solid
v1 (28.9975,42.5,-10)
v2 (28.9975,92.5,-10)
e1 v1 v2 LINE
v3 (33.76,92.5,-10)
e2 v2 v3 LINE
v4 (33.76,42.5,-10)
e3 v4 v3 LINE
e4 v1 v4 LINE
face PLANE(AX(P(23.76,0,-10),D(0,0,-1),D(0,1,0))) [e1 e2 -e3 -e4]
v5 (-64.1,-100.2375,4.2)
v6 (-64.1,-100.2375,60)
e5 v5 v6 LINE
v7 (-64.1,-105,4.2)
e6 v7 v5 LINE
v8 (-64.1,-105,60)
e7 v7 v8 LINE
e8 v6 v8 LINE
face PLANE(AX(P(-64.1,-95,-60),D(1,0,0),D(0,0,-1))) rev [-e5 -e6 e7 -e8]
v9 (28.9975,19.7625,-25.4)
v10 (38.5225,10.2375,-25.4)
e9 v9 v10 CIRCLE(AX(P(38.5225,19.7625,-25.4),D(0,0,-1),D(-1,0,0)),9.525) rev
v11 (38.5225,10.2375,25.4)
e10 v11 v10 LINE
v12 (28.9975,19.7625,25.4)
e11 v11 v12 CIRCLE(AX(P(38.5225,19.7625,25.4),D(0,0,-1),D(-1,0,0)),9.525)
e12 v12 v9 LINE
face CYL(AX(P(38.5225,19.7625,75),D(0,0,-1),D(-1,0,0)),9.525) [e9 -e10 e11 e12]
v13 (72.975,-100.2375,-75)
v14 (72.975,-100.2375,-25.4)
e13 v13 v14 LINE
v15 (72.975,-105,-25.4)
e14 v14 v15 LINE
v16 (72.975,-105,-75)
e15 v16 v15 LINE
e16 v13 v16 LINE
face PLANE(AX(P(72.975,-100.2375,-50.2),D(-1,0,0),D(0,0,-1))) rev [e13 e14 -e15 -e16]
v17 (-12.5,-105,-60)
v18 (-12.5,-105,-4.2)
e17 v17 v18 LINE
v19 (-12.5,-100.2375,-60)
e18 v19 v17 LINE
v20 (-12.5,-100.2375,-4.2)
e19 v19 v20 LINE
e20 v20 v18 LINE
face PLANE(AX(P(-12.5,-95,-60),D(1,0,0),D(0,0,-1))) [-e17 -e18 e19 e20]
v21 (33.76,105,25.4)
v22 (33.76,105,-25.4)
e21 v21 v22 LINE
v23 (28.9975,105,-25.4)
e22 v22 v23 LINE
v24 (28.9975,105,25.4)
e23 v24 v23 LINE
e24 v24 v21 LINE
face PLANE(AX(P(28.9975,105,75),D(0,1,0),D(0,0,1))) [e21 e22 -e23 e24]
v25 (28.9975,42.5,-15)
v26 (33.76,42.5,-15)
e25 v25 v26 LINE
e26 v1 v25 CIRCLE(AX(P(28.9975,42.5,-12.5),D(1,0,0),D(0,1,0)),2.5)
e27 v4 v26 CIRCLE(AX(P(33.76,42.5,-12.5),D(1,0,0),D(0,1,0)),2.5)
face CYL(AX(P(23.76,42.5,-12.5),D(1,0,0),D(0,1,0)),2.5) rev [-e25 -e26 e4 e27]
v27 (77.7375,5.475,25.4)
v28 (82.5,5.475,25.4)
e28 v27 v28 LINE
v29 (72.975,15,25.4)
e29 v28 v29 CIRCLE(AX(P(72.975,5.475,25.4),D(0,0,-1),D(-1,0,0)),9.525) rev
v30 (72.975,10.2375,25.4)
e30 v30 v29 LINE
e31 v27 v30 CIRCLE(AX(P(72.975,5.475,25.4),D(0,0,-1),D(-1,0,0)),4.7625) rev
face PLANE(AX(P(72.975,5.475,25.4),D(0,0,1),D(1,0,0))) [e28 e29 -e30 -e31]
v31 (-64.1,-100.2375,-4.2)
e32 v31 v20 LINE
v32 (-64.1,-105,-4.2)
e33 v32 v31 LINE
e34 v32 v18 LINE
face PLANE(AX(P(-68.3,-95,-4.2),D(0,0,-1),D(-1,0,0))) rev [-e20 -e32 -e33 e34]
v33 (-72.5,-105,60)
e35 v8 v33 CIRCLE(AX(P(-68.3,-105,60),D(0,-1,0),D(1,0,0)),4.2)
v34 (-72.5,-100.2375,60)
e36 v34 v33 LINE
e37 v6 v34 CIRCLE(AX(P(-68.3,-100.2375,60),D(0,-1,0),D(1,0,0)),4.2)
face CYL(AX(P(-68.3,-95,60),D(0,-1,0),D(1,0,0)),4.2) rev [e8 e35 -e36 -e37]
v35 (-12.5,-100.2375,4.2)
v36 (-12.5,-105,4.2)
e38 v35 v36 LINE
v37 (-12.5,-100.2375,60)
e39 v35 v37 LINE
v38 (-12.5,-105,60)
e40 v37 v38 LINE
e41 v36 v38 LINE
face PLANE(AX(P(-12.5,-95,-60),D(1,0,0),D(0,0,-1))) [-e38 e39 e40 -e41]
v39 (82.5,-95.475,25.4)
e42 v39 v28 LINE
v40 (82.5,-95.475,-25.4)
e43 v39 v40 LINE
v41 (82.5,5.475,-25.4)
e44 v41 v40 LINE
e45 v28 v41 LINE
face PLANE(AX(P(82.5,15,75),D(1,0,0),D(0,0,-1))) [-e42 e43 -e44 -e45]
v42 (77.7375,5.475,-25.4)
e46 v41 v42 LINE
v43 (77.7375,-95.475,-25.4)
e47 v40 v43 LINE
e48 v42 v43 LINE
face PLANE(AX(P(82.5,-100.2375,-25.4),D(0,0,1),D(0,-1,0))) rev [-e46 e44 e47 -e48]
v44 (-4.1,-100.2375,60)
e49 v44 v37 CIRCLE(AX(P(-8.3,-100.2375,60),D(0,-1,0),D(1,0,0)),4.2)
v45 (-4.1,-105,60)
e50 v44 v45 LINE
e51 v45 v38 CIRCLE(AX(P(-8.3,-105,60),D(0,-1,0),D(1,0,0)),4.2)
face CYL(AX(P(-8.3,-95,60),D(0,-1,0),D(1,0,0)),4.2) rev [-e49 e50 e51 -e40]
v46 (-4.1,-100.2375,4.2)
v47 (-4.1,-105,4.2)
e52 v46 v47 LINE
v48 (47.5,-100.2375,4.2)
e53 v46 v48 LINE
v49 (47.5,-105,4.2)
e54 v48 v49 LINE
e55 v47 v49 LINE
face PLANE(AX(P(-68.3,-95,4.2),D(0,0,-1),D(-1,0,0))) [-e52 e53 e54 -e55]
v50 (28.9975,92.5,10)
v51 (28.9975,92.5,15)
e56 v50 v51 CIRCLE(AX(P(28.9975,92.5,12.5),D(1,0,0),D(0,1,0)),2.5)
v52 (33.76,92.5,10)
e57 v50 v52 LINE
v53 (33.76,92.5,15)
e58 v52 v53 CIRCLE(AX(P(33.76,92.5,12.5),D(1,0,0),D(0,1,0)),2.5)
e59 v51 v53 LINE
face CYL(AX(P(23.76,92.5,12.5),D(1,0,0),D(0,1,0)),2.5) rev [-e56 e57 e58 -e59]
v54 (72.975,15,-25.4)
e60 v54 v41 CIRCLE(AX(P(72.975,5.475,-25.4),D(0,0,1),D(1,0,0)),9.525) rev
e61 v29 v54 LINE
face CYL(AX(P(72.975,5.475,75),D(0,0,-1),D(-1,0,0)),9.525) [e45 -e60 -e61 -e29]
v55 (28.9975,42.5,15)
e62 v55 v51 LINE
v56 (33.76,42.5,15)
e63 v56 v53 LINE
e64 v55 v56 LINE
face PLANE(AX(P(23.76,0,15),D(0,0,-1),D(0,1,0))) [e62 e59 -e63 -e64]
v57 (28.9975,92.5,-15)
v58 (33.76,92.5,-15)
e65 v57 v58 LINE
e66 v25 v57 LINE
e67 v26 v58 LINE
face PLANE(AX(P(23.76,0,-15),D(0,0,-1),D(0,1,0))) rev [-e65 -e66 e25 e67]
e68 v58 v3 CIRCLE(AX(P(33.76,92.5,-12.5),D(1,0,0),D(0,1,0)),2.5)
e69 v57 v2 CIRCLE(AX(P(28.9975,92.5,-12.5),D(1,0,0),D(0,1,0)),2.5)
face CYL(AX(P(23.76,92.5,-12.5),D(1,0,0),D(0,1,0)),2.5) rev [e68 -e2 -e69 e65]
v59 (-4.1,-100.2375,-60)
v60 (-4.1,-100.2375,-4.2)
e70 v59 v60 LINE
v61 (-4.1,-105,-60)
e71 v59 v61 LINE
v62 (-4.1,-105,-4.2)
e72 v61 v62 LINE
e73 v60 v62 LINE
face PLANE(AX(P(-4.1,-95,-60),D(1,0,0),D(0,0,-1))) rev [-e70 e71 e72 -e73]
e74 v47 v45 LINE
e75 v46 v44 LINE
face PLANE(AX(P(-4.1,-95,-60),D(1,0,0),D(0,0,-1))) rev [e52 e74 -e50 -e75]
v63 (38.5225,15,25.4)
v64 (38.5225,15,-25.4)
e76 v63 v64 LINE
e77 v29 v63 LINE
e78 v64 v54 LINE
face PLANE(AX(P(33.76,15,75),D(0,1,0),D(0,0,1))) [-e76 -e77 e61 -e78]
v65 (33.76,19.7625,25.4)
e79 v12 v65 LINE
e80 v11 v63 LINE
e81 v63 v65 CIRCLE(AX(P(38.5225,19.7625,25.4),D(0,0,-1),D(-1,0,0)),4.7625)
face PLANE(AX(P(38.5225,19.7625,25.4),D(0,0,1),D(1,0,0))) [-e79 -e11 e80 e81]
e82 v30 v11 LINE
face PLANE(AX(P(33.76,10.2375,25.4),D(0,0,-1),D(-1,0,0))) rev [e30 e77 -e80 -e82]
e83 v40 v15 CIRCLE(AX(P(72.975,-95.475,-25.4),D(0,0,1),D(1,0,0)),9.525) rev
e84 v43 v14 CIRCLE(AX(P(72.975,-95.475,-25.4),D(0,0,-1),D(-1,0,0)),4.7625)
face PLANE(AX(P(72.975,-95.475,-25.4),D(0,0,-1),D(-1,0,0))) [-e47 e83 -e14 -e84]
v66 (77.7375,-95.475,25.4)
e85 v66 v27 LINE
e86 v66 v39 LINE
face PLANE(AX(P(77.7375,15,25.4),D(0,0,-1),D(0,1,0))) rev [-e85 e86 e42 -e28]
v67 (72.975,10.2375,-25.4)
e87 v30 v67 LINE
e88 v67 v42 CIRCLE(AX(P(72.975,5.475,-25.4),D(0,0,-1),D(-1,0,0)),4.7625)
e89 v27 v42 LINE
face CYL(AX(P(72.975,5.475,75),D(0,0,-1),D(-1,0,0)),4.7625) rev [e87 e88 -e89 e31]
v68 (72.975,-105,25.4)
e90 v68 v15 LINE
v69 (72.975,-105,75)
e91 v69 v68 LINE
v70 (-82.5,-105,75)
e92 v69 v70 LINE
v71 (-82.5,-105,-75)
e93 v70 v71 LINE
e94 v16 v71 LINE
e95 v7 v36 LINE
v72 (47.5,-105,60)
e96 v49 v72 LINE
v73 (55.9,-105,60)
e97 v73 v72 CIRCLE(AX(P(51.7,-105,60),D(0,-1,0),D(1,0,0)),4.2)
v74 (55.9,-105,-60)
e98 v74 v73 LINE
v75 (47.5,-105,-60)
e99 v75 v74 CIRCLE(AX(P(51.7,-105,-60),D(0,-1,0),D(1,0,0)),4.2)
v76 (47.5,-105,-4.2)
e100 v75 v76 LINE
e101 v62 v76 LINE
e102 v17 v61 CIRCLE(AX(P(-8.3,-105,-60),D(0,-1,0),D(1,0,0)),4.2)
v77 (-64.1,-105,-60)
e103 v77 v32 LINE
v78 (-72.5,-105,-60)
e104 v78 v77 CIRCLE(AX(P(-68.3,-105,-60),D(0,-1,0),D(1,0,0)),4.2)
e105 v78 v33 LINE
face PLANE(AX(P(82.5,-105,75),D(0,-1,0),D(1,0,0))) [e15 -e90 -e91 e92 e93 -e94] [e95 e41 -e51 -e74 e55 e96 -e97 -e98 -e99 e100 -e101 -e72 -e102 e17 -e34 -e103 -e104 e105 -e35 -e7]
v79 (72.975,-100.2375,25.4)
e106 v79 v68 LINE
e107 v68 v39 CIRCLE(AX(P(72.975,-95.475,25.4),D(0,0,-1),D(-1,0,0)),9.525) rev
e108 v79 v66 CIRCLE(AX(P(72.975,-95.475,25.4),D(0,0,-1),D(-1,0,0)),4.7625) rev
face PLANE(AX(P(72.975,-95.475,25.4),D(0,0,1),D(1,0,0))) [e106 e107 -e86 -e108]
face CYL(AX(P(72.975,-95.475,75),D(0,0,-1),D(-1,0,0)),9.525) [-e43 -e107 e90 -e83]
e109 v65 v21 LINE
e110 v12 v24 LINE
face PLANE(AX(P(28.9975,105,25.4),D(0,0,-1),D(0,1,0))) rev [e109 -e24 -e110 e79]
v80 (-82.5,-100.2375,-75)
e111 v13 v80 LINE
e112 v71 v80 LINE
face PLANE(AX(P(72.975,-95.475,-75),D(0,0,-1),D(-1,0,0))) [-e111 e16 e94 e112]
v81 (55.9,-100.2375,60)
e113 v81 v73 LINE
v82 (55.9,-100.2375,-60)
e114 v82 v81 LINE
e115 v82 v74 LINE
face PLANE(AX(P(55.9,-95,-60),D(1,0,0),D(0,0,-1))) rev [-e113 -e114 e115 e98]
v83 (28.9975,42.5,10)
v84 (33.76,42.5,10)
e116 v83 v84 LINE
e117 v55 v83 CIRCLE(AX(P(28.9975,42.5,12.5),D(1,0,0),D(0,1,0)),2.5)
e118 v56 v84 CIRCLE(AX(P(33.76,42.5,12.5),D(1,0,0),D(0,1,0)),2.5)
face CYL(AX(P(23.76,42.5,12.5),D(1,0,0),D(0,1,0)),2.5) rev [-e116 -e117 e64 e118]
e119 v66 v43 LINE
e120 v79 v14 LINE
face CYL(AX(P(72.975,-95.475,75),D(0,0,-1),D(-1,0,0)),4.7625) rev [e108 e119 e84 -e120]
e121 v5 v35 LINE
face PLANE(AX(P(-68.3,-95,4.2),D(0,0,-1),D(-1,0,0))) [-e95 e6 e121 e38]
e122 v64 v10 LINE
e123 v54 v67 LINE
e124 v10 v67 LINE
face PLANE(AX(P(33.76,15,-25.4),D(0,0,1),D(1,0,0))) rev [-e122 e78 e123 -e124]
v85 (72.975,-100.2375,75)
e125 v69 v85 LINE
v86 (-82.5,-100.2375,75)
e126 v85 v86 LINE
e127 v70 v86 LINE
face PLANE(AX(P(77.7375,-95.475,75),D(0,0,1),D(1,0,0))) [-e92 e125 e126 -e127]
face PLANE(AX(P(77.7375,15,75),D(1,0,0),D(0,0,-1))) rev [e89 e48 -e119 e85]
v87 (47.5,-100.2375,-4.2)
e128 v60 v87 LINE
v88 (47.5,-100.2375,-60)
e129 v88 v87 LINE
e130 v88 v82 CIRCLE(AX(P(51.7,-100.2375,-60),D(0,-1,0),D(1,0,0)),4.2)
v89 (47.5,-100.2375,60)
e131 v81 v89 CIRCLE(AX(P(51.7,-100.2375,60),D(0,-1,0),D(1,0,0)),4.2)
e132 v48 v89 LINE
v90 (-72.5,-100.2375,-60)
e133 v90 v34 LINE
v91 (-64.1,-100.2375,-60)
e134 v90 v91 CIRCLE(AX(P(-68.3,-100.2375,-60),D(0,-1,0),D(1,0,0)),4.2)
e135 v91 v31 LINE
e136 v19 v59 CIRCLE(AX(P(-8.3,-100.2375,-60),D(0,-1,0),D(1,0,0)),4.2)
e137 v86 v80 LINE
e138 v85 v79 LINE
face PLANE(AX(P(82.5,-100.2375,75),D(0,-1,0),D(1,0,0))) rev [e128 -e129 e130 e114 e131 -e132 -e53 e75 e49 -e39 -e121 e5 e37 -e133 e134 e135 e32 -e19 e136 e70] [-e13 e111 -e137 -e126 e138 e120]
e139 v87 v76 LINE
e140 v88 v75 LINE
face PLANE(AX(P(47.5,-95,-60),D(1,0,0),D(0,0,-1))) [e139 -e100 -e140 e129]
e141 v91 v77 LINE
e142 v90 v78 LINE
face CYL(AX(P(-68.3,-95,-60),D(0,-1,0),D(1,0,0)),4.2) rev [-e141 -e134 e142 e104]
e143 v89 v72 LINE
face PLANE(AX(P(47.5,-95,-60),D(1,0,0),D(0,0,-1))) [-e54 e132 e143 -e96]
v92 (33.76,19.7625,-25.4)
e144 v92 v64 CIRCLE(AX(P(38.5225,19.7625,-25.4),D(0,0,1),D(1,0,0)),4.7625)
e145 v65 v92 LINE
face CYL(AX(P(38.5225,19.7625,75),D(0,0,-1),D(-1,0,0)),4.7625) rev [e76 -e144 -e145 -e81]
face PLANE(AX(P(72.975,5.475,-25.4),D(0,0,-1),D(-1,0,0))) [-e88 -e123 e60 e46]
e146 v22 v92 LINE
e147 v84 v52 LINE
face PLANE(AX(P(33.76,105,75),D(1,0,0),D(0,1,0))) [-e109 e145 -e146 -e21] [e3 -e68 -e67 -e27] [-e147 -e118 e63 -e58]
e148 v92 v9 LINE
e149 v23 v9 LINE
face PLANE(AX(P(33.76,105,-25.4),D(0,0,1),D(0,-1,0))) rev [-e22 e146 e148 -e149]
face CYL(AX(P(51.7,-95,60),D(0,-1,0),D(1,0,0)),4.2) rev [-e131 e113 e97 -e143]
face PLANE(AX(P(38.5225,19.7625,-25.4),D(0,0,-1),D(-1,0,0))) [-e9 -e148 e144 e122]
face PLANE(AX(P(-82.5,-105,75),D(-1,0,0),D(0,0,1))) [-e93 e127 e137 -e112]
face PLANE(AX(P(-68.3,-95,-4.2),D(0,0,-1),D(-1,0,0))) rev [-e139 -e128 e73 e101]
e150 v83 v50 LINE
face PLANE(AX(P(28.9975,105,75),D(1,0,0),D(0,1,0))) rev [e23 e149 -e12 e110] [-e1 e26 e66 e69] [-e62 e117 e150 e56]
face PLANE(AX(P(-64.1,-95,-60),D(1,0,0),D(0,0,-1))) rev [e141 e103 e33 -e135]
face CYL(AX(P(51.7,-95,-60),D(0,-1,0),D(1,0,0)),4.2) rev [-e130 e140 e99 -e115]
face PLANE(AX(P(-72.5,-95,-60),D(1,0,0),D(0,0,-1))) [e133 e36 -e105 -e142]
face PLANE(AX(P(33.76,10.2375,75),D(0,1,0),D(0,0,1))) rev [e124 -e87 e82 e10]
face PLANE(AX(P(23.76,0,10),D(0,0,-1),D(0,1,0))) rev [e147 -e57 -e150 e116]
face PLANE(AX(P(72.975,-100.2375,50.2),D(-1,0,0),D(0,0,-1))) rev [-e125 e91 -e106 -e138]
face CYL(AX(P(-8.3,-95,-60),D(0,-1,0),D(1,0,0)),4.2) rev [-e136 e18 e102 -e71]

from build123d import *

# Parameters (mm, degrees)
BRIDA_BASE1_DEPTH           = 75
CORTAR_EXTRUIR1_START       = -9.525
CORTAR_EXTRUIR1_OUTLINE_W   = 49.6
CORTAR_EXTRUIR1_OUTLINE_H   = 121
CORTAR_EXTRUIR1_DEPTH       = 9.525
CORTAR_EXTRUIR1_START_2     = -53.5025
CORTAR_EXTRUIR1_2_OUTLINE_W = 49.6
CORTAR_EXTRUIR1_2_OUTLINE_H = 94.7625
CORTAR_EXTRUIR1_2_DEPTH     = 43.9775
CORTAR_EXTRUIR2_DEPTH       = 10
CORTAR_EXTRUIR3_DEPTH       = 10


# Read off the part's stored shape, not the designer's step: Cortar-Extruir1
# Sheet-metal steps are written as plain solids
with BuildPart() as part:
    # Croquis1 → Brida base1 (new, symmetric)
    with BuildSketch(Plane.XY):
        with BuildLine():
            Line((33.76, 105), (33.76, 19.7625))
            ThreePointArc((33.76, 19.7625), (35.154903955, 16.394903955), (38.5225, 15))
            Line((38.5225, 15), (72.975, 15))
            ThreePointArc((72.975, 15), (79.710192091, 12.210192091), (82.5, 5.475))
            Line((82.5, 5.475), (82.5, -95.475))
            ThreePointArc((82.5, -95.475), (79.710192091, -102.210192091), (72.975, -105))
            Line((72.975, -105), (-82.5, -105))
            Line((-82.5, -105), (-82.5, -100.2375))
            Line((-82.5, -100.2375), (72.975, -100.2375))
            ThreePointArc((72.975, -100.2375), (76.342596045, -98.842596045), (77.7375, -95.475))
            Line((77.7375, -95.475), (77.7375, 5.475))
            ThreePointArc((77.7375, 5.475), (76.342596045, 8.842596045), (72.975, 10.2375))
            Line((72.975, 10.2375), (38.5225, 10.2375))
            ThreePointArc((38.5225, 10.2375), (31.787307909, 13.027307909), (28.9975, 19.7625))
            Line((28.9975, 19.7625), (28.9975, 105))
            Line((28.9975, 105), (33.76, 105))
        make_face()
    extrude(amount=BRIDA_BASE1_DEPTH, both=True)

    # Cortar-Extruir1 outline → Cortar-Extruir1 (cut)
    with BuildSketch(Plane(origin=(82.5, 0, 0), x_dir=(0, 0, -1), z_dir=(1, 0, 0)).offset(CORTAR_EXTRUIR1_START)):
        with Locations((50.2, -45.5)):
            Rectangle(CORTAR_EXTRUIR1_OUTLINE_W, CORTAR_EXTRUIR1_OUTLINE_H)
        with Locations((-50.2, -45.5)):
            Rectangle(CORTAR_EXTRUIR1_OUTLINE_W, CORTAR_EXTRUIR1_OUTLINE_H)
    extrude(amount=CORTAR_EXTRUIR1_DEPTH, mode=Mode.SUBTRACT)

    # Cortar-Extruir1 2 outline → Cortar-Extruir1 2 (cut)
    with BuildSketch(Plane(origin=(82.5, 0, 0), x_dir=(0, 0, -1), z_dir=(1, 0, 0)).offset(CORTAR_EXTRUIR1_START_2)):
        with Locations((50.2, 57.61875)):
            Rectangle(CORTAR_EXTRUIR1_2_OUTLINE_W, CORTAR_EXTRUIR1_2_OUTLINE_H)
        with Locations((-50.2, 57.61875)):
            Rectangle(CORTAR_EXTRUIR1_2_OUTLINE_W, CORTAR_EXTRUIR1_2_OUTLINE_H)
    extrude(amount=CORTAR_EXTRUIR1_2_DEPTH, mode=Mode.SUBTRACT)

    # Croquis7 → Cortar-Extruir2 (cut)
    with BuildSketch(Plane(origin=(33.76, 0, 0), x_dir=(0, 0, -1), z_dir=(1, 0, 0))):
        with BuildLine():
            Line((-15, 42.5), (-15, 67.5))
            ThreePointArc((-15, 67.5), (-12.5, 65), (-10, 67.5))
            Line((-10, 67.5), (-10, 42.5))
            ThreePointArc((-10, 42.5), (-12.5, 40), (-15, 42.5))
        make_face()
        with BuildLine():
            ThreePointArc((-15, 67.5), (-12.5, 65), (-10, 67.5))
            ThreePointArc((-10, 67.5), (-12.5, 70), (-15, 67.5))
        make_face()
        with BuildLine():
            ThreePointArc((-10, 67.5), (-12.5, 70), (-15, 67.5))
            Line((-15, 67.5), (-15, 92.5))
            ThreePointArc((-15, 92.5), (-12.5, 95), (-10, 92.5))
            Line((-10, 92.5), (-10, 67.5))
        make_face()
        with BuildLine():
            ThreePointArc((15, 67.5), (12.5, 70), (10, 67.5))
            Line((10, 67.5), (10, 92.5))
            ThreePointArc((10, 92.5), (12.5, 95), (15, 92.5))
            Line((15, 92.5), (15, 67.5))
        make_face()
        with BuildLine():
            ThreePointArc((10, 67.5), (12.5, 65), (15, 67.5))
            ThreePointArc((15, 67.5), (12.5, 70), (10, 67.5))
        make_face()
        with BuildLine():
            Line((10, 42.5), (10, 67.5))
            ThreePointArc((10, 67.5), (12.5, 65), (15, 67.5))
            Line((15, 67.5), (15, 42.5))
            ThreePointArc((15, 42.5), (12.5, 40), (10, 42.5))
        make_face()
    extrude(amount=-CORTAR_EXTRUIR2_DEPTH, mode=Mode.SUBTRACT)

    # Croquis8 → Cortar-Extruir3 (cut)
    with BuildSketch(Plane.XZ.offset(105)):
        with BuildLine():
            Line((-72.5, -60), (-72.5, 60))
            ThreePointArc((-72.5, 60), (-68.3, 64.2), (-64.1, 60))
            Line((-64.1, 60), (-64.1, -60))
            ThreePointArc((-64.1, -60), (-68.3, -64.2), (-72.5, -60))
        make_face()
        with BuildLine():
            Line((-12.5, -60), (-12.5, 60))
            ThreePointArc((-12.5, 60), (-8.3, 64.2), (-4.1, 60))
            Line((-4.1, 60), (-4.1, -60))
            ThreePointArc((-4.1, -60), (-8.3, -64.2), (-12.5, -60))
        make_face()
        with BuildLine():
            Line((47.5, -60), (47.5, 60))
            ThreePointArc((47.5, 60), (51.7, 64.2), (55.9, 60))
            Line((55.9, 60), (55.9, -60))
            ThreePointArc((55.9, -60), (51.7, -64.2), (47.5, -60))
        make_face()
        with BuildLine():
            Line((-68.3, 4.2), (51.7, 4.2))
            ThreePointArc((51.7, 4.2), (55.9, 0), (51.7, -4.2))
            Line((51.7, -4.2), (-68.3, -4.2))
            ThreePointArc((-68.3, -4.2), (-72.5, 0), (-68.3, 4.2))
        make_face()
    extrude(amount=-CORTAR_EXTRUIR3_DEPTH, mode=Mode.SUBTRACT)


solid = part.part
